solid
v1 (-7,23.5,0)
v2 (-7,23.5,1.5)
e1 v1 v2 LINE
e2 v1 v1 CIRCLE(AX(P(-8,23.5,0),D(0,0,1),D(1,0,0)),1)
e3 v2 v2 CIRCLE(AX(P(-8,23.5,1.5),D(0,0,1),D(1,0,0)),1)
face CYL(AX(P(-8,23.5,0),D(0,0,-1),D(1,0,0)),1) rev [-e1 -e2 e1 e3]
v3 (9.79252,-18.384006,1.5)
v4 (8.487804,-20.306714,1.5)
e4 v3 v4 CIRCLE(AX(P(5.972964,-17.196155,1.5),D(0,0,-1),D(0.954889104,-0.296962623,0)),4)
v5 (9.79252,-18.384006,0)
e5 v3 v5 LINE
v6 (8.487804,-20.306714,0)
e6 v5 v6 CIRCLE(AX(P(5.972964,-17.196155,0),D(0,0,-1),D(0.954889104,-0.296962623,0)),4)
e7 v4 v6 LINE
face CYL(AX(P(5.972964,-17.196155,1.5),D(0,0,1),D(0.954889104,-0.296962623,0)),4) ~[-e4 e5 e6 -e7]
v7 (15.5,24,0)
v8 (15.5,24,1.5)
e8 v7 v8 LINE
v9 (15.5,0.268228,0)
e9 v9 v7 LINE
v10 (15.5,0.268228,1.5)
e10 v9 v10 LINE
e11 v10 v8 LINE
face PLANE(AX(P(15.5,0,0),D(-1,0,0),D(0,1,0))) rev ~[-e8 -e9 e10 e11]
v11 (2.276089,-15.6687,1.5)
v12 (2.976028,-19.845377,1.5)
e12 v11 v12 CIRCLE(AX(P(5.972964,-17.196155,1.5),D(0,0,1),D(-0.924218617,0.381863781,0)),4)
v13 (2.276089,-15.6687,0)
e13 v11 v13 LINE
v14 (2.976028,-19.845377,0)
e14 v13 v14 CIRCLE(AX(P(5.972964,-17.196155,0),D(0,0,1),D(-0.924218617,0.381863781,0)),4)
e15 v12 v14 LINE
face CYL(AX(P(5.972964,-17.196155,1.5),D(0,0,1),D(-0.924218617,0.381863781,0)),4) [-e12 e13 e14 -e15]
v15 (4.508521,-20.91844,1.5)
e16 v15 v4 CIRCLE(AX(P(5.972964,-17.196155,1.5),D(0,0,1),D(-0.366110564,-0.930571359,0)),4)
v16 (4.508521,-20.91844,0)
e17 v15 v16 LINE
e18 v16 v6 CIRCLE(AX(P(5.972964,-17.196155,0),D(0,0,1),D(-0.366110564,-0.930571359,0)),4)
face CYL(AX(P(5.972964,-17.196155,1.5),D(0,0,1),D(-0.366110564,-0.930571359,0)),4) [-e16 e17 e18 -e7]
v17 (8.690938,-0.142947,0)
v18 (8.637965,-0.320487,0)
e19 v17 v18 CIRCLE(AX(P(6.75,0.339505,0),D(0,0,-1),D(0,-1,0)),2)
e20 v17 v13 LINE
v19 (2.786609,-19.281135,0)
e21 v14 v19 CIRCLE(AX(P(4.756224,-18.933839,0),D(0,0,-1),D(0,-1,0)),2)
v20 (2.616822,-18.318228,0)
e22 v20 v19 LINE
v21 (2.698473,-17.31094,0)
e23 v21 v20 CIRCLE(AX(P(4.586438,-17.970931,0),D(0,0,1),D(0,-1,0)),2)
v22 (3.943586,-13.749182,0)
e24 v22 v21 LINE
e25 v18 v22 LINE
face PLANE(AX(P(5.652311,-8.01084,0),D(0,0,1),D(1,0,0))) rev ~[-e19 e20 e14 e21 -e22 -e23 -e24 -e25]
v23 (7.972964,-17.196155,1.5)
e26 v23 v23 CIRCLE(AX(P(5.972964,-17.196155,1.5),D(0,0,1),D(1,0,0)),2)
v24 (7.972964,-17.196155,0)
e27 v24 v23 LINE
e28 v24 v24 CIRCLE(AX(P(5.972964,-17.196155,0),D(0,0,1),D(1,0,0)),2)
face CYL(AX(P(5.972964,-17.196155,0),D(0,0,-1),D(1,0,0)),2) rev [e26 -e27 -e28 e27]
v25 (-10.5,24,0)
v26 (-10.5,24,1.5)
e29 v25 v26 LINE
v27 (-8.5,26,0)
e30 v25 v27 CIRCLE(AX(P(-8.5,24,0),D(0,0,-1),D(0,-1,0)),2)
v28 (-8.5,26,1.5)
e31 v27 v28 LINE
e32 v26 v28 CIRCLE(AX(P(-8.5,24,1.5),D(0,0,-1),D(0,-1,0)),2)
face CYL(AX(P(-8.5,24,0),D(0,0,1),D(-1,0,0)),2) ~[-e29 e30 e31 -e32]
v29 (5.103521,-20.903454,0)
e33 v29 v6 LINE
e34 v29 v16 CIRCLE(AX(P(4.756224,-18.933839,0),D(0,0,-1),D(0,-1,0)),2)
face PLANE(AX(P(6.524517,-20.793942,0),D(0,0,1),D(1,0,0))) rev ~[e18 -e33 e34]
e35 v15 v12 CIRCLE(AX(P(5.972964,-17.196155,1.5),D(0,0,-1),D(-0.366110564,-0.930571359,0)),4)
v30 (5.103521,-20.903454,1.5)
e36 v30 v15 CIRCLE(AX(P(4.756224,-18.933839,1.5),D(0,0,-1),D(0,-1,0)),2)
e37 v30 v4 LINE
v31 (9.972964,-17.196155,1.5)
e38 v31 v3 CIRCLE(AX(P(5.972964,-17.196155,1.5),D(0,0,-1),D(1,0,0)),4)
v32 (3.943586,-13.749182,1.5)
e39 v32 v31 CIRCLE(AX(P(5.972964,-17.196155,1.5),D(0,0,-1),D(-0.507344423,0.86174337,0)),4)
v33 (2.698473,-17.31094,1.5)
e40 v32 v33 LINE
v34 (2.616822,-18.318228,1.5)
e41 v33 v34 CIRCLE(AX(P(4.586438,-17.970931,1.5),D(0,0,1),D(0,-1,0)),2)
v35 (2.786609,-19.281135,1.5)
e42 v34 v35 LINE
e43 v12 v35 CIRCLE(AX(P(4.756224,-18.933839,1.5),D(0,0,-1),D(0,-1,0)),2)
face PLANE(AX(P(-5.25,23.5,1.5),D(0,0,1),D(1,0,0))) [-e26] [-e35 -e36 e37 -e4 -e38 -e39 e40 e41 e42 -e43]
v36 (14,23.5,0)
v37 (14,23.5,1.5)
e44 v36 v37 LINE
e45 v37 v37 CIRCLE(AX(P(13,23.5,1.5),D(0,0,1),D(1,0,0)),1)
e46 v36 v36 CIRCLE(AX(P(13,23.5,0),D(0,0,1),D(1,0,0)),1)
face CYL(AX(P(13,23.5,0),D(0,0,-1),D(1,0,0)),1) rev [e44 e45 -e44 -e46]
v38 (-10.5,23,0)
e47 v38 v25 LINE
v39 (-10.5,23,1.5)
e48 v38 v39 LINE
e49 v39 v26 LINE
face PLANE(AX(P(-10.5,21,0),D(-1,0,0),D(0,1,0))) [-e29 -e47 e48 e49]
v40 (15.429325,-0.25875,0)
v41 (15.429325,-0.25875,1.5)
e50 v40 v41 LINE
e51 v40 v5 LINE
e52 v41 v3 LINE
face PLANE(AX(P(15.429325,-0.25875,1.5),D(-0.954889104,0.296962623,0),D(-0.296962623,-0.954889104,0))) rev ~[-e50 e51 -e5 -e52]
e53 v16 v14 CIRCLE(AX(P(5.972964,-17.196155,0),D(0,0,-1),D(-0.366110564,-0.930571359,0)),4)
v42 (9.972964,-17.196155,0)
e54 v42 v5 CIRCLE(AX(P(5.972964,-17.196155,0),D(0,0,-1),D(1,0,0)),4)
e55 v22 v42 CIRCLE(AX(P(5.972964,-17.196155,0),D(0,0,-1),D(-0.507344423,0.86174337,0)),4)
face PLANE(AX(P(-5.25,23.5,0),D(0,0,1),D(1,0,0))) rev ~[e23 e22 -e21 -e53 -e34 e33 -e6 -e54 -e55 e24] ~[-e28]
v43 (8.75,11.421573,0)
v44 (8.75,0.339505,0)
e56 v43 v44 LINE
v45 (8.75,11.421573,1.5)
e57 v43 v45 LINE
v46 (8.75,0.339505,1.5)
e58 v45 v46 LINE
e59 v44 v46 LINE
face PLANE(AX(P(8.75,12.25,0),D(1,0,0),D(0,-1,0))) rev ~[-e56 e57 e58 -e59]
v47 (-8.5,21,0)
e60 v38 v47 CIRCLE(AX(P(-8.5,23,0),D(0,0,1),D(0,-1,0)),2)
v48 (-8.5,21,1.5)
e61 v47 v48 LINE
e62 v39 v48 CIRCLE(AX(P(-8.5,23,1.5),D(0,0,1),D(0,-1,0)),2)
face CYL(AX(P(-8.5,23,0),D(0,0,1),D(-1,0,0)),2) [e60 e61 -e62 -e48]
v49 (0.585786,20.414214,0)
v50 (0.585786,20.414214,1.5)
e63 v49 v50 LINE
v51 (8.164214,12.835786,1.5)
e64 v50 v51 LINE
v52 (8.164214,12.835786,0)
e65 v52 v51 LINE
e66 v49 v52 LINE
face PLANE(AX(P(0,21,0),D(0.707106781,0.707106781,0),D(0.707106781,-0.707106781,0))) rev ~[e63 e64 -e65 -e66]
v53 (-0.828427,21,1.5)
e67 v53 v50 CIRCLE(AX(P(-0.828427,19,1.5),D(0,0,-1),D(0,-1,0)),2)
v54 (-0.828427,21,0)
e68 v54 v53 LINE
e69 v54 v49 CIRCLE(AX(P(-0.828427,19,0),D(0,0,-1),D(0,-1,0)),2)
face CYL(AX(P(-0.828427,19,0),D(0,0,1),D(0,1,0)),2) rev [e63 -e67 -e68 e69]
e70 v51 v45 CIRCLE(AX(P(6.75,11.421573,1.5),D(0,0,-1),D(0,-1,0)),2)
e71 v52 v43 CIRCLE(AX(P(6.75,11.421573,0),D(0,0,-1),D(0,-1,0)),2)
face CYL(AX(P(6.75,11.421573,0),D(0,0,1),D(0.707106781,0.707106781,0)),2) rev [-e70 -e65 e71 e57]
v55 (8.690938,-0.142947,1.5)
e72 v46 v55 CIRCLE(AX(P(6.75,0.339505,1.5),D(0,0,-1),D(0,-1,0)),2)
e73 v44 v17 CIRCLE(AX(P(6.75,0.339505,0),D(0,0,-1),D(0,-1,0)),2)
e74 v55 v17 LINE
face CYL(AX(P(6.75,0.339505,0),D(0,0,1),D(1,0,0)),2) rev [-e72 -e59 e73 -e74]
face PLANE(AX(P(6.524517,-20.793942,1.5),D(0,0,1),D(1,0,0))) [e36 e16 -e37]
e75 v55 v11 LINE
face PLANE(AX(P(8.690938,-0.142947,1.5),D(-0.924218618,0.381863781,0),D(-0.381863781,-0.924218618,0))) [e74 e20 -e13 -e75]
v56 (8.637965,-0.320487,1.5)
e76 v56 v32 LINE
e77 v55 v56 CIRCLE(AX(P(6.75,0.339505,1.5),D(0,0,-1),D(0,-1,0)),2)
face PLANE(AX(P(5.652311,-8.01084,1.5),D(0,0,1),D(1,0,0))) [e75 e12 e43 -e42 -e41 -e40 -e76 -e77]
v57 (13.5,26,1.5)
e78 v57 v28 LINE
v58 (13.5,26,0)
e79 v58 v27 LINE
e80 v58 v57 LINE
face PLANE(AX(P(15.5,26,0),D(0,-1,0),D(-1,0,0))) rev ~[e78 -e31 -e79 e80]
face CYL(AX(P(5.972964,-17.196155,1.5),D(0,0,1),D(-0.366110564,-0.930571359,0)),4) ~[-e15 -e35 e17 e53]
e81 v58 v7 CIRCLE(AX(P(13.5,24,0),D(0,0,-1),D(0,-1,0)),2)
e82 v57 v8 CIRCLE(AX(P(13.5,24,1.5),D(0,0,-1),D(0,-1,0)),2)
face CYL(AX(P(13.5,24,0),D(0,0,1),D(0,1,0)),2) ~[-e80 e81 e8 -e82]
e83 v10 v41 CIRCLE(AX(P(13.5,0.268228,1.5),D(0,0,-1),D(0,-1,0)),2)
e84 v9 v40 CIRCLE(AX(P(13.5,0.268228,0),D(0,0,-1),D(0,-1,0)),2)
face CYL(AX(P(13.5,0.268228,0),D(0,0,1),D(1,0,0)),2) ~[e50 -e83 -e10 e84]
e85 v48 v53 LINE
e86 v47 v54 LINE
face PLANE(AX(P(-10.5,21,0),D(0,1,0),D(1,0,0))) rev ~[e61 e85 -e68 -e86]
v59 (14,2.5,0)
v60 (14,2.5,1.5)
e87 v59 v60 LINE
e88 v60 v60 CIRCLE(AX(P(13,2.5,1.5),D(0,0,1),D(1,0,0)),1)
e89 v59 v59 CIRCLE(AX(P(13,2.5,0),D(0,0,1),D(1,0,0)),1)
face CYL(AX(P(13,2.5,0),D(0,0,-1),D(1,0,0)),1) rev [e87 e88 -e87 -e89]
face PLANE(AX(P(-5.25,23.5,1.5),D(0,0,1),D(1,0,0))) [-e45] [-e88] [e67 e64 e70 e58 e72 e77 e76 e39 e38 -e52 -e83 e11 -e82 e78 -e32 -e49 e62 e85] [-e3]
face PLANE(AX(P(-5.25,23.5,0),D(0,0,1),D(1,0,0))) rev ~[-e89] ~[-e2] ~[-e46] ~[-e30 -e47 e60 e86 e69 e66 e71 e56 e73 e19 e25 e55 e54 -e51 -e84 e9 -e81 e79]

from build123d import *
from build123d import SkipClean  # not in build123d's __all__

# Parameters (mm, degrees)
F0_W     = 10.5
F0_H     = 5
F0_R     = 1
F0_R_2   = 2
F1_DEPTH = 1.5
F2_R     = 2
F4_DEPTH = 1.5
F3_R     = 1
F5_DEPTH = 1.5


with BuildPart() as f1:
    # F0 (on Top) → F1 (new body)
    with BuildSketch(Plane.XY):
        with Locations((-5.25, 23.5)):
            Rectangle(F0_W, F0_H)
        with Locations((-8, 23.5)):
            Circle(F0_R, mode=Mode.SUBTRACT)
        Polygon((8.75, 21), (0, 21), (8.75, 12.25), align=None)
        Polygon((8.75, 2.5), (8.75, 0), (15.5, 0), (15.5, 26), (0, 26), (0, 21), (8.75, 21), (8.75, 12.25), align=None)
        with Locations((13, 2.5)):
            Circle(F0_R, mode=Mode.SUBTRACT)
        with Locations((13, 23.5)):
            Circle(F0_R, mode=Mode.SUBTRACT)
        Polygon((15.5, 0), (8.75, 0), (2.5261364178, -17.8039236821), (3.1339050396, -21.2507508176), (10.0275593107, -20.035213574), align=None)
        with Locations((5.9729635533, -17.1961550602)):
            Circle(F0_R_2, mode=Mode.SUBTRACT)
    extrude(amount=F1_DEPTH)

    # F2
    f2_edges = [f1.edges().sort_by_distance(p)[0] for p in [
        (3.133905, -21.250751, 0.75),
        (2.526136, -17.803924, 0.75),
        (10.027559, -20.035214, 0.75),
        (0, 21, 0.75),
        (8.75, 12.25, 0.75),
        (8.75, 0, 0.75),
        (15.5, 0, 0.75),
        (-10.5, 21, 0.75),
        (-10.5, 26, 0.75),
        (15.5, 26, 0.75),
    ]]
    fillet(f2_edges, radius=F2_R)

    # F3 (on face) → F4 (cut, through all)
    with BuildSketch(Plane.XY.offset(1.5)):
        with BuildLine():
            Line((15.4293248166, -0.2587497013), (9.7925199679, -18.3840055542))
            ThreePointArc((9.7925199679, -18.3840055542), (9.2828500145, -19.4421852503), (8.4878041885, -20.3067139457))
            Line((8.4878041885, -20.3067139457), (8.7794635144, -20.2552865373))
            ThreePointArc((8.7794635144, -20.2552865373), (9.7797768114, -19.7634897702), (10.3614919757, -18.8126489739))
            Line((10.3614919757, -18.8126489739), (15.4293248166, -0.2587497013))
        make_face()
        with BuildLine():
            ThreePointArc((2.9760281468, -19.8453772421), (3.6090713176, -20.5721430448), (4.5085212955, -20.9184404971))
            ThreePointArc((4.5085212955, -20.9184404971), (3.6786578079, -20.4727632374), (2.9760281468, -19.8453772421))
        make_face()
    extrude(amount=-F4_DEPTH, mode=Mode.SUBTRACT)

    # F3 (on face) → F5 (join)
    with BuildSketch(Plane.XY.offset(1.5)):
        with BuildLine():
            ThreePointArc((2.2760890833, -15.6686999373), (2.9532568393, -14.5729182502), (3.9435858611, -13.7491815787))
            Line((3.9435858611, -13.7491815787), (8.6379648829, -0.3204865672))
            ThreePointArc((8.6379648829, -0.3204865672), (8.6665084457, -0.2323302993), (8.6909380974, -0.1429465499))
            Line((8.6909380974, -0.1429465499), (2.2760890833, -15.6686999373))
        make_face()
        with BuildLine():
            Line((2.6984727346, -17.3109400888), (3.9435858611, -13.7491815787))
            ThreePointArc((3.9435858611, -13.7491815787), (2.9532568393, -14.5729182502), (2.2760890833, -15.6686999373))
            ThreePointArc((2.2760890833, -15.6686999373), (2.027975468, -17.8572670075), (2.9760281468, -19.8453772421))
            ThreePointArc((2.9760281468, -19.8453772421), (2.8602115576, -19.570341978), (2.7866086843, -19.2811353116))
            Line((2.7866086843, -19.2811353116), (2.6168221115, -18.3182278083))
            ThreePointArc((2.6168221115, -18.3182278083), (2.5929761176, -17.8093417002), (2.6984727346, -17.3109400888))
        make_face()
        with BuildLine():
            ThreePointArc((4.5085212955, -20.9184404971), (6.5807353289, -21.1497121256), (8.4878041885, -20.3067139457))
            Line((8.4878041885, -20.3067139457), (5.1035205457, -20.9034544623))
            ThreePointArc((5.1035205457, -20.9034544623), (4.8065815101, -20.9332048908), (4.5085212955, -20.9184404971))
        make_face()
        with BuildLine():
            ThreePointArc((9.9729635533, -17.1961550602), (9.927595373, -17.7968939144), (9.7925199679, -18.3840055542))
            Line((9.7925199679, -18.3840055542), (15.4293248166, -0.2587497013))
            ThreePointArc((15.4293248166, -0.2587497013), (15.4822524604, 0.0023801957), (15.5, 0.2682282413))
            Line((15.5, 0.2682282413), (15.5, 24))
            ThreePointArc((15.5, 24), (14.9142135624, 25.4142135624), (13.5, 26))
            Line((13.5, 26), (-8.5, 26))
            ThreePointArc((-8.5, 26), (-9.9142135624, 25.4142135624), (-10.5, 24))
            Line((-10.5, 24), (-10.5, 23))
            ThreePointArc((-10.5, 23), (-9.9142135624, 21.5857864376), (-8.5, 21))
            Line((-8.5, 21), (-0.8284271247, 21))
            ThreePointArc((-0.8284271247, 21), (-0.06306026, 20.847759065), (0.5857864376, 20.4142135624))
            Line((0.5857864376, 20.4142135624), (8.1642135624, 12.8357864376))
            ThreePointArc((8.1642135624, 12.8357864376), (8.597759065, 12.18693974), (8.75, 11.4215728753))
            Line((8.75, 11.4215728753), (8.75, 0.339504797))
            ThreePointArc((8.75, 0.339504797), (8.7351796134, 0.0964782499), (8.6909380974, -0.1429465499))
            ThreePointArc((8.6909380974, -0.1429465499), (8.6665084457, -0.2323302993), (8.6379648829, -0.3204865672))
            Line((8.6379648829, -0.3204865672), (3.9435858611, -13.7491815787))
            ThreePointArc((3.9435858611, -13.7491815787), (7.9582203668, -13.7235831914), (9.9729635533, -17.1961550602))
        make_face()
        with Locations((-8, 23.5)):
            Circle(F3_R, mode=Mode.SUBTRACT)
        with Locations((13, 2.5)):
            Circle(F3_R, mode=Mode.SUBTRACT)
        with Locations((13, 23.5)):
            Circle(F3_R, mode=Mode.SUBTRACT)
    with SkipClean():  # cleaning this boolean's faces spoils the solid; the shape is the same uncleaned
        extrude(amount=-F5_DEPTH)


solid = f1.part
